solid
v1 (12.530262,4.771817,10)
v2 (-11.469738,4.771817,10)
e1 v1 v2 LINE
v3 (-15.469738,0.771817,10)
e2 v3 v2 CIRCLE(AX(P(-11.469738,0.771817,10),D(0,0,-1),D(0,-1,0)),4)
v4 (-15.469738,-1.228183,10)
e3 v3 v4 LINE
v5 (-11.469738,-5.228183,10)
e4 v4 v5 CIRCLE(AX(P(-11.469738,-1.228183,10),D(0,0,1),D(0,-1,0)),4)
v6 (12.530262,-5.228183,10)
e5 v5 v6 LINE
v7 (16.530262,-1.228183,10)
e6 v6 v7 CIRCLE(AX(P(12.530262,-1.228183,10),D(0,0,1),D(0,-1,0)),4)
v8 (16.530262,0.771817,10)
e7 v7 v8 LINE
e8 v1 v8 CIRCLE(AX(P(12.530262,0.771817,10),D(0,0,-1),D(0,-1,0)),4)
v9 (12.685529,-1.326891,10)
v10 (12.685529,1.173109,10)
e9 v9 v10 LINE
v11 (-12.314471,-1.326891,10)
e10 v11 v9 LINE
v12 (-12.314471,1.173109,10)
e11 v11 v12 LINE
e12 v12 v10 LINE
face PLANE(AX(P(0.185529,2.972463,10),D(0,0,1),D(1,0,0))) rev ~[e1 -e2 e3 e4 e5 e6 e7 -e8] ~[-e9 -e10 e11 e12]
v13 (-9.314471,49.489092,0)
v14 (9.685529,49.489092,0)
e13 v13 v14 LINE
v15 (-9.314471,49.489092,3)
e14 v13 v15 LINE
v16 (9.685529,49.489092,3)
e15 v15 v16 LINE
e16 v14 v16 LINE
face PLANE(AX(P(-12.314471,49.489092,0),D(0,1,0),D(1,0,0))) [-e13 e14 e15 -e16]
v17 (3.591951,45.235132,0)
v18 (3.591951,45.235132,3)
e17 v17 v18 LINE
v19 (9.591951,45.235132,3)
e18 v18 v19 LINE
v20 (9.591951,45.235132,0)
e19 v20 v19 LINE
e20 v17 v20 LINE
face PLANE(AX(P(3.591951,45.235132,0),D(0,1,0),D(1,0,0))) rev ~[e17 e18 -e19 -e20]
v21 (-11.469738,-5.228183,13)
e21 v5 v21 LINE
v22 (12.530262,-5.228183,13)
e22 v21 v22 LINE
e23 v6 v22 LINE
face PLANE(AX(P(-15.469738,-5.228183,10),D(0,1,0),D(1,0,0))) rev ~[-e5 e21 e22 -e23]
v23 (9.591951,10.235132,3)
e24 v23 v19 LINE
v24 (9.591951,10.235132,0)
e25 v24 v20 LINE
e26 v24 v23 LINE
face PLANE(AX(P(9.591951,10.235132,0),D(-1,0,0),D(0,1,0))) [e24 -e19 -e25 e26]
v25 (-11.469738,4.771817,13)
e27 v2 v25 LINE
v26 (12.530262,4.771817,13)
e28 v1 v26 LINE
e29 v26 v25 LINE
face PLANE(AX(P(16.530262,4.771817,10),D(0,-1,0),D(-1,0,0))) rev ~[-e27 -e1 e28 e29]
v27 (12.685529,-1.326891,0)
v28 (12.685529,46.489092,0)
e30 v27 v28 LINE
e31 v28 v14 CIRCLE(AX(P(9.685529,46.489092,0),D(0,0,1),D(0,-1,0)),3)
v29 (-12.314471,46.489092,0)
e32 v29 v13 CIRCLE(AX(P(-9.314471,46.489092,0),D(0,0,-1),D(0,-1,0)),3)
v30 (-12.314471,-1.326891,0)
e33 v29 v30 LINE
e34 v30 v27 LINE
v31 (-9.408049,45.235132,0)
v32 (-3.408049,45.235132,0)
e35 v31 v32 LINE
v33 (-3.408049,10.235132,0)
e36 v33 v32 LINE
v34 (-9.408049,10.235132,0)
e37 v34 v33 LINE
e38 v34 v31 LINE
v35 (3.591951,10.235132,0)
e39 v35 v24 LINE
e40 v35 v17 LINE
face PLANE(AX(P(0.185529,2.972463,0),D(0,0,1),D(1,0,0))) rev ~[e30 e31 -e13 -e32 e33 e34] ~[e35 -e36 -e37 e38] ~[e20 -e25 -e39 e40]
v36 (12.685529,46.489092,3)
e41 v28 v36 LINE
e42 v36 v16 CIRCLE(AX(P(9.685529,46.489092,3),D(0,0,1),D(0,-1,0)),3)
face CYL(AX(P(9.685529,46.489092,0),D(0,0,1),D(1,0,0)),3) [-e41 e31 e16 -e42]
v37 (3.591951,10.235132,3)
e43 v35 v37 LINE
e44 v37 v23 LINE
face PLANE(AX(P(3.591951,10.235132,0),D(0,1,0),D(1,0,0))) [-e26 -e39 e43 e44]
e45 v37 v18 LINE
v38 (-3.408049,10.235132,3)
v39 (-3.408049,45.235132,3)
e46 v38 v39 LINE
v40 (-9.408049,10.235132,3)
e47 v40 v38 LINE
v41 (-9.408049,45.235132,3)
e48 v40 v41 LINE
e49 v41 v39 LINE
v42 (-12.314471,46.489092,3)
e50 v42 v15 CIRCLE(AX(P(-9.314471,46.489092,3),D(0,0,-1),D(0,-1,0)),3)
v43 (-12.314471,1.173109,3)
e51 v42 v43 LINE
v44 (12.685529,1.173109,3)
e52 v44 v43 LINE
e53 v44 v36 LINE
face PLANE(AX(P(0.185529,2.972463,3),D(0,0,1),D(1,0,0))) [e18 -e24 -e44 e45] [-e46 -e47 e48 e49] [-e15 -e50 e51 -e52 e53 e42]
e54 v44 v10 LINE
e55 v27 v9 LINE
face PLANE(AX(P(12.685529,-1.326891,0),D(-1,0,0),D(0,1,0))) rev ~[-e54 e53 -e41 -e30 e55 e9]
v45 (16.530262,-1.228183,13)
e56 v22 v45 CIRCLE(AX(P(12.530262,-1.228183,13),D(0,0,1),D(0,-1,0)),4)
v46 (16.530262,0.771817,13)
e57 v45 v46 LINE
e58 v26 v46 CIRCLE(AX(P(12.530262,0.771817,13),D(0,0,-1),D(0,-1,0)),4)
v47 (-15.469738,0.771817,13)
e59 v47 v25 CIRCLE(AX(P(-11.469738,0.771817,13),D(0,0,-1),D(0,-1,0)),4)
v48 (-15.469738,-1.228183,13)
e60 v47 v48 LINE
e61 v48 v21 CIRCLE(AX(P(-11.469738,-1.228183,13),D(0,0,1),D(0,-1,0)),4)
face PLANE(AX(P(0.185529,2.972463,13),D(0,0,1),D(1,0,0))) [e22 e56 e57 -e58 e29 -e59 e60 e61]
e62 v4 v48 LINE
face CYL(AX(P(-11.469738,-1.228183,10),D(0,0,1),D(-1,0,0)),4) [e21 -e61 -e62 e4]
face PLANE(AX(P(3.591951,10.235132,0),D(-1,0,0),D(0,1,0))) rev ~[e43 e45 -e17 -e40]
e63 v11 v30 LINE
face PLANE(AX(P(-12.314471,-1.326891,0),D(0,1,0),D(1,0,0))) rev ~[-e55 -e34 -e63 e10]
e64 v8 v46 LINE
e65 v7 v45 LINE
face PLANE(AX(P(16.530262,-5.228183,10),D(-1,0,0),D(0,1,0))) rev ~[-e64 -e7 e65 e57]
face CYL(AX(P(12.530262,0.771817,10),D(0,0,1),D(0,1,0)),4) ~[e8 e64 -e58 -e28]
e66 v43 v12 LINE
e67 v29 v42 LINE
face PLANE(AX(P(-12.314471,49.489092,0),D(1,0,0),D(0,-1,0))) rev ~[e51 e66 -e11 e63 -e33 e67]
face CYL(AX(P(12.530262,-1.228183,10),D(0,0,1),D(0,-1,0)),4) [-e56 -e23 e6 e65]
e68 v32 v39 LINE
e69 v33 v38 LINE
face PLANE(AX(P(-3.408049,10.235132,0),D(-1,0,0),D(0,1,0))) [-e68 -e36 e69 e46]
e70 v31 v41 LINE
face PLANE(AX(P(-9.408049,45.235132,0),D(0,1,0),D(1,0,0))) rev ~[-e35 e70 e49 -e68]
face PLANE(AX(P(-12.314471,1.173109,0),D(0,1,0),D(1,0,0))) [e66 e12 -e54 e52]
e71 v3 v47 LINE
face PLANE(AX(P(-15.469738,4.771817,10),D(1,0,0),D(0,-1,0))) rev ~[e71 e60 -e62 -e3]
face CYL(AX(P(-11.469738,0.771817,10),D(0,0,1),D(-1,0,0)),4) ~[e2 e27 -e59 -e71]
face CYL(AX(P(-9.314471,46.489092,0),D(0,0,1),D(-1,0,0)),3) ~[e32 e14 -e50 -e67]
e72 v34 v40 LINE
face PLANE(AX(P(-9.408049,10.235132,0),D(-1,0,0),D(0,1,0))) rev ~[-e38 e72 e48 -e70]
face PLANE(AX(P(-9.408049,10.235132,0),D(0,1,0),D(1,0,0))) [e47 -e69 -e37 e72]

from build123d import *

# Parameters (mm, degrees)
F0_W     = 25
F0_H     = 3.598708484
F0_H_2   = 2.5
F0_H_3   = 44.7172746155
F0_W_2   = 6
F0_H_4   = 35
F1_DEPTH = 3
F2_DEPTH = 10
F3_START = 10
F3_DEPTH = 3
F4_R     = 4
F5_R     = 3


# Not quite as in the source:
# - a feature names something its author has since deleted; it is built from what else it names


with BuildPart() as f1:
    # F0 (on Top) → F1 (new body)
    with BuildSketch(Plane.XY):
        with Locations((0.1855289564, 2.9724632242)):
            Rectangle(F0_W, F0_H)
        with Locations((0.1855289564, -0.0768910178)):
            Rectangle(F0_W, F0_H_2)
        with Locations((0.1855289564, 27.130454774)):
            Rectangle(F0_W, F0_H_3)
        with Locations((-6.4080492333, 27.7351317182)):
            Rectangle(F0_W_2, F0_H_4, mode=Mode.SUBTRACT)
        with Locations((6.5919507667, 27.7351317182)):
            Rectangle(F0_W_2, F0_H_4, mode=Mode.SUBTRACT)
    extrude(amount=F1_DEPTH)

    # F0 (on Top) → F2 (join)
    with BuildSketch(Plane.XY):
        with Locations((0.1855289564, -0.0768910178)):
            Rectangle(F0_W, F0_H_2)
    extrude(amount=F2_DEPTH)

    # F0 (on Top) → F3 (join)
    with BuildSketch(Plane.XY.offset(F3_START)):
        with Locations((0.1855289564, 2.9724632242)):
            Rectangle(F0_W, F0_H)
        Polygon((-12.3144710436, -1.3268910178), (-12.3144710436, 1.1731089822), (-12.3144710436, 4.7718174662), (-15.4697376937, 4.7718174662), (-15.4697376937, -5.2281825338), (16.5302623063, -5.2281825338), (16.5302623063, 4.7718174662), (12.6855289564, 4.7718174662), (12.6855289564, 1.1731089822), (12.6855289564, -1.3268910178), align=None)
        with Locations((0.1855289564, -0.0768910178)):
            Rectangle(F0_W, F0_H_2)
    extrude(amount=F3_DEPTH)

    # F4
    f4_edges = [f1.edges().sort_by_distance(p)[0] for p in [
        (16.530262, -5.228183, 11.5),
        (16.530262, 4.771817, 11.5),
        (-15.469738, -5.228183, 11.5),
        (-15.469738, 4.771817, 11.5),
    ]]
    fillet(f4_edges, radius=F4_R)

    # F5
    f5_edges = [f1.edges().sort_by_distance(p)[0] for p in [
        (-12.314471, 49.489092, 1.5),
        (12.685529, 49.489092, 1.5),
    ]]
    fillet(f5_edges, radius=F5_R)


solid = f1.part
